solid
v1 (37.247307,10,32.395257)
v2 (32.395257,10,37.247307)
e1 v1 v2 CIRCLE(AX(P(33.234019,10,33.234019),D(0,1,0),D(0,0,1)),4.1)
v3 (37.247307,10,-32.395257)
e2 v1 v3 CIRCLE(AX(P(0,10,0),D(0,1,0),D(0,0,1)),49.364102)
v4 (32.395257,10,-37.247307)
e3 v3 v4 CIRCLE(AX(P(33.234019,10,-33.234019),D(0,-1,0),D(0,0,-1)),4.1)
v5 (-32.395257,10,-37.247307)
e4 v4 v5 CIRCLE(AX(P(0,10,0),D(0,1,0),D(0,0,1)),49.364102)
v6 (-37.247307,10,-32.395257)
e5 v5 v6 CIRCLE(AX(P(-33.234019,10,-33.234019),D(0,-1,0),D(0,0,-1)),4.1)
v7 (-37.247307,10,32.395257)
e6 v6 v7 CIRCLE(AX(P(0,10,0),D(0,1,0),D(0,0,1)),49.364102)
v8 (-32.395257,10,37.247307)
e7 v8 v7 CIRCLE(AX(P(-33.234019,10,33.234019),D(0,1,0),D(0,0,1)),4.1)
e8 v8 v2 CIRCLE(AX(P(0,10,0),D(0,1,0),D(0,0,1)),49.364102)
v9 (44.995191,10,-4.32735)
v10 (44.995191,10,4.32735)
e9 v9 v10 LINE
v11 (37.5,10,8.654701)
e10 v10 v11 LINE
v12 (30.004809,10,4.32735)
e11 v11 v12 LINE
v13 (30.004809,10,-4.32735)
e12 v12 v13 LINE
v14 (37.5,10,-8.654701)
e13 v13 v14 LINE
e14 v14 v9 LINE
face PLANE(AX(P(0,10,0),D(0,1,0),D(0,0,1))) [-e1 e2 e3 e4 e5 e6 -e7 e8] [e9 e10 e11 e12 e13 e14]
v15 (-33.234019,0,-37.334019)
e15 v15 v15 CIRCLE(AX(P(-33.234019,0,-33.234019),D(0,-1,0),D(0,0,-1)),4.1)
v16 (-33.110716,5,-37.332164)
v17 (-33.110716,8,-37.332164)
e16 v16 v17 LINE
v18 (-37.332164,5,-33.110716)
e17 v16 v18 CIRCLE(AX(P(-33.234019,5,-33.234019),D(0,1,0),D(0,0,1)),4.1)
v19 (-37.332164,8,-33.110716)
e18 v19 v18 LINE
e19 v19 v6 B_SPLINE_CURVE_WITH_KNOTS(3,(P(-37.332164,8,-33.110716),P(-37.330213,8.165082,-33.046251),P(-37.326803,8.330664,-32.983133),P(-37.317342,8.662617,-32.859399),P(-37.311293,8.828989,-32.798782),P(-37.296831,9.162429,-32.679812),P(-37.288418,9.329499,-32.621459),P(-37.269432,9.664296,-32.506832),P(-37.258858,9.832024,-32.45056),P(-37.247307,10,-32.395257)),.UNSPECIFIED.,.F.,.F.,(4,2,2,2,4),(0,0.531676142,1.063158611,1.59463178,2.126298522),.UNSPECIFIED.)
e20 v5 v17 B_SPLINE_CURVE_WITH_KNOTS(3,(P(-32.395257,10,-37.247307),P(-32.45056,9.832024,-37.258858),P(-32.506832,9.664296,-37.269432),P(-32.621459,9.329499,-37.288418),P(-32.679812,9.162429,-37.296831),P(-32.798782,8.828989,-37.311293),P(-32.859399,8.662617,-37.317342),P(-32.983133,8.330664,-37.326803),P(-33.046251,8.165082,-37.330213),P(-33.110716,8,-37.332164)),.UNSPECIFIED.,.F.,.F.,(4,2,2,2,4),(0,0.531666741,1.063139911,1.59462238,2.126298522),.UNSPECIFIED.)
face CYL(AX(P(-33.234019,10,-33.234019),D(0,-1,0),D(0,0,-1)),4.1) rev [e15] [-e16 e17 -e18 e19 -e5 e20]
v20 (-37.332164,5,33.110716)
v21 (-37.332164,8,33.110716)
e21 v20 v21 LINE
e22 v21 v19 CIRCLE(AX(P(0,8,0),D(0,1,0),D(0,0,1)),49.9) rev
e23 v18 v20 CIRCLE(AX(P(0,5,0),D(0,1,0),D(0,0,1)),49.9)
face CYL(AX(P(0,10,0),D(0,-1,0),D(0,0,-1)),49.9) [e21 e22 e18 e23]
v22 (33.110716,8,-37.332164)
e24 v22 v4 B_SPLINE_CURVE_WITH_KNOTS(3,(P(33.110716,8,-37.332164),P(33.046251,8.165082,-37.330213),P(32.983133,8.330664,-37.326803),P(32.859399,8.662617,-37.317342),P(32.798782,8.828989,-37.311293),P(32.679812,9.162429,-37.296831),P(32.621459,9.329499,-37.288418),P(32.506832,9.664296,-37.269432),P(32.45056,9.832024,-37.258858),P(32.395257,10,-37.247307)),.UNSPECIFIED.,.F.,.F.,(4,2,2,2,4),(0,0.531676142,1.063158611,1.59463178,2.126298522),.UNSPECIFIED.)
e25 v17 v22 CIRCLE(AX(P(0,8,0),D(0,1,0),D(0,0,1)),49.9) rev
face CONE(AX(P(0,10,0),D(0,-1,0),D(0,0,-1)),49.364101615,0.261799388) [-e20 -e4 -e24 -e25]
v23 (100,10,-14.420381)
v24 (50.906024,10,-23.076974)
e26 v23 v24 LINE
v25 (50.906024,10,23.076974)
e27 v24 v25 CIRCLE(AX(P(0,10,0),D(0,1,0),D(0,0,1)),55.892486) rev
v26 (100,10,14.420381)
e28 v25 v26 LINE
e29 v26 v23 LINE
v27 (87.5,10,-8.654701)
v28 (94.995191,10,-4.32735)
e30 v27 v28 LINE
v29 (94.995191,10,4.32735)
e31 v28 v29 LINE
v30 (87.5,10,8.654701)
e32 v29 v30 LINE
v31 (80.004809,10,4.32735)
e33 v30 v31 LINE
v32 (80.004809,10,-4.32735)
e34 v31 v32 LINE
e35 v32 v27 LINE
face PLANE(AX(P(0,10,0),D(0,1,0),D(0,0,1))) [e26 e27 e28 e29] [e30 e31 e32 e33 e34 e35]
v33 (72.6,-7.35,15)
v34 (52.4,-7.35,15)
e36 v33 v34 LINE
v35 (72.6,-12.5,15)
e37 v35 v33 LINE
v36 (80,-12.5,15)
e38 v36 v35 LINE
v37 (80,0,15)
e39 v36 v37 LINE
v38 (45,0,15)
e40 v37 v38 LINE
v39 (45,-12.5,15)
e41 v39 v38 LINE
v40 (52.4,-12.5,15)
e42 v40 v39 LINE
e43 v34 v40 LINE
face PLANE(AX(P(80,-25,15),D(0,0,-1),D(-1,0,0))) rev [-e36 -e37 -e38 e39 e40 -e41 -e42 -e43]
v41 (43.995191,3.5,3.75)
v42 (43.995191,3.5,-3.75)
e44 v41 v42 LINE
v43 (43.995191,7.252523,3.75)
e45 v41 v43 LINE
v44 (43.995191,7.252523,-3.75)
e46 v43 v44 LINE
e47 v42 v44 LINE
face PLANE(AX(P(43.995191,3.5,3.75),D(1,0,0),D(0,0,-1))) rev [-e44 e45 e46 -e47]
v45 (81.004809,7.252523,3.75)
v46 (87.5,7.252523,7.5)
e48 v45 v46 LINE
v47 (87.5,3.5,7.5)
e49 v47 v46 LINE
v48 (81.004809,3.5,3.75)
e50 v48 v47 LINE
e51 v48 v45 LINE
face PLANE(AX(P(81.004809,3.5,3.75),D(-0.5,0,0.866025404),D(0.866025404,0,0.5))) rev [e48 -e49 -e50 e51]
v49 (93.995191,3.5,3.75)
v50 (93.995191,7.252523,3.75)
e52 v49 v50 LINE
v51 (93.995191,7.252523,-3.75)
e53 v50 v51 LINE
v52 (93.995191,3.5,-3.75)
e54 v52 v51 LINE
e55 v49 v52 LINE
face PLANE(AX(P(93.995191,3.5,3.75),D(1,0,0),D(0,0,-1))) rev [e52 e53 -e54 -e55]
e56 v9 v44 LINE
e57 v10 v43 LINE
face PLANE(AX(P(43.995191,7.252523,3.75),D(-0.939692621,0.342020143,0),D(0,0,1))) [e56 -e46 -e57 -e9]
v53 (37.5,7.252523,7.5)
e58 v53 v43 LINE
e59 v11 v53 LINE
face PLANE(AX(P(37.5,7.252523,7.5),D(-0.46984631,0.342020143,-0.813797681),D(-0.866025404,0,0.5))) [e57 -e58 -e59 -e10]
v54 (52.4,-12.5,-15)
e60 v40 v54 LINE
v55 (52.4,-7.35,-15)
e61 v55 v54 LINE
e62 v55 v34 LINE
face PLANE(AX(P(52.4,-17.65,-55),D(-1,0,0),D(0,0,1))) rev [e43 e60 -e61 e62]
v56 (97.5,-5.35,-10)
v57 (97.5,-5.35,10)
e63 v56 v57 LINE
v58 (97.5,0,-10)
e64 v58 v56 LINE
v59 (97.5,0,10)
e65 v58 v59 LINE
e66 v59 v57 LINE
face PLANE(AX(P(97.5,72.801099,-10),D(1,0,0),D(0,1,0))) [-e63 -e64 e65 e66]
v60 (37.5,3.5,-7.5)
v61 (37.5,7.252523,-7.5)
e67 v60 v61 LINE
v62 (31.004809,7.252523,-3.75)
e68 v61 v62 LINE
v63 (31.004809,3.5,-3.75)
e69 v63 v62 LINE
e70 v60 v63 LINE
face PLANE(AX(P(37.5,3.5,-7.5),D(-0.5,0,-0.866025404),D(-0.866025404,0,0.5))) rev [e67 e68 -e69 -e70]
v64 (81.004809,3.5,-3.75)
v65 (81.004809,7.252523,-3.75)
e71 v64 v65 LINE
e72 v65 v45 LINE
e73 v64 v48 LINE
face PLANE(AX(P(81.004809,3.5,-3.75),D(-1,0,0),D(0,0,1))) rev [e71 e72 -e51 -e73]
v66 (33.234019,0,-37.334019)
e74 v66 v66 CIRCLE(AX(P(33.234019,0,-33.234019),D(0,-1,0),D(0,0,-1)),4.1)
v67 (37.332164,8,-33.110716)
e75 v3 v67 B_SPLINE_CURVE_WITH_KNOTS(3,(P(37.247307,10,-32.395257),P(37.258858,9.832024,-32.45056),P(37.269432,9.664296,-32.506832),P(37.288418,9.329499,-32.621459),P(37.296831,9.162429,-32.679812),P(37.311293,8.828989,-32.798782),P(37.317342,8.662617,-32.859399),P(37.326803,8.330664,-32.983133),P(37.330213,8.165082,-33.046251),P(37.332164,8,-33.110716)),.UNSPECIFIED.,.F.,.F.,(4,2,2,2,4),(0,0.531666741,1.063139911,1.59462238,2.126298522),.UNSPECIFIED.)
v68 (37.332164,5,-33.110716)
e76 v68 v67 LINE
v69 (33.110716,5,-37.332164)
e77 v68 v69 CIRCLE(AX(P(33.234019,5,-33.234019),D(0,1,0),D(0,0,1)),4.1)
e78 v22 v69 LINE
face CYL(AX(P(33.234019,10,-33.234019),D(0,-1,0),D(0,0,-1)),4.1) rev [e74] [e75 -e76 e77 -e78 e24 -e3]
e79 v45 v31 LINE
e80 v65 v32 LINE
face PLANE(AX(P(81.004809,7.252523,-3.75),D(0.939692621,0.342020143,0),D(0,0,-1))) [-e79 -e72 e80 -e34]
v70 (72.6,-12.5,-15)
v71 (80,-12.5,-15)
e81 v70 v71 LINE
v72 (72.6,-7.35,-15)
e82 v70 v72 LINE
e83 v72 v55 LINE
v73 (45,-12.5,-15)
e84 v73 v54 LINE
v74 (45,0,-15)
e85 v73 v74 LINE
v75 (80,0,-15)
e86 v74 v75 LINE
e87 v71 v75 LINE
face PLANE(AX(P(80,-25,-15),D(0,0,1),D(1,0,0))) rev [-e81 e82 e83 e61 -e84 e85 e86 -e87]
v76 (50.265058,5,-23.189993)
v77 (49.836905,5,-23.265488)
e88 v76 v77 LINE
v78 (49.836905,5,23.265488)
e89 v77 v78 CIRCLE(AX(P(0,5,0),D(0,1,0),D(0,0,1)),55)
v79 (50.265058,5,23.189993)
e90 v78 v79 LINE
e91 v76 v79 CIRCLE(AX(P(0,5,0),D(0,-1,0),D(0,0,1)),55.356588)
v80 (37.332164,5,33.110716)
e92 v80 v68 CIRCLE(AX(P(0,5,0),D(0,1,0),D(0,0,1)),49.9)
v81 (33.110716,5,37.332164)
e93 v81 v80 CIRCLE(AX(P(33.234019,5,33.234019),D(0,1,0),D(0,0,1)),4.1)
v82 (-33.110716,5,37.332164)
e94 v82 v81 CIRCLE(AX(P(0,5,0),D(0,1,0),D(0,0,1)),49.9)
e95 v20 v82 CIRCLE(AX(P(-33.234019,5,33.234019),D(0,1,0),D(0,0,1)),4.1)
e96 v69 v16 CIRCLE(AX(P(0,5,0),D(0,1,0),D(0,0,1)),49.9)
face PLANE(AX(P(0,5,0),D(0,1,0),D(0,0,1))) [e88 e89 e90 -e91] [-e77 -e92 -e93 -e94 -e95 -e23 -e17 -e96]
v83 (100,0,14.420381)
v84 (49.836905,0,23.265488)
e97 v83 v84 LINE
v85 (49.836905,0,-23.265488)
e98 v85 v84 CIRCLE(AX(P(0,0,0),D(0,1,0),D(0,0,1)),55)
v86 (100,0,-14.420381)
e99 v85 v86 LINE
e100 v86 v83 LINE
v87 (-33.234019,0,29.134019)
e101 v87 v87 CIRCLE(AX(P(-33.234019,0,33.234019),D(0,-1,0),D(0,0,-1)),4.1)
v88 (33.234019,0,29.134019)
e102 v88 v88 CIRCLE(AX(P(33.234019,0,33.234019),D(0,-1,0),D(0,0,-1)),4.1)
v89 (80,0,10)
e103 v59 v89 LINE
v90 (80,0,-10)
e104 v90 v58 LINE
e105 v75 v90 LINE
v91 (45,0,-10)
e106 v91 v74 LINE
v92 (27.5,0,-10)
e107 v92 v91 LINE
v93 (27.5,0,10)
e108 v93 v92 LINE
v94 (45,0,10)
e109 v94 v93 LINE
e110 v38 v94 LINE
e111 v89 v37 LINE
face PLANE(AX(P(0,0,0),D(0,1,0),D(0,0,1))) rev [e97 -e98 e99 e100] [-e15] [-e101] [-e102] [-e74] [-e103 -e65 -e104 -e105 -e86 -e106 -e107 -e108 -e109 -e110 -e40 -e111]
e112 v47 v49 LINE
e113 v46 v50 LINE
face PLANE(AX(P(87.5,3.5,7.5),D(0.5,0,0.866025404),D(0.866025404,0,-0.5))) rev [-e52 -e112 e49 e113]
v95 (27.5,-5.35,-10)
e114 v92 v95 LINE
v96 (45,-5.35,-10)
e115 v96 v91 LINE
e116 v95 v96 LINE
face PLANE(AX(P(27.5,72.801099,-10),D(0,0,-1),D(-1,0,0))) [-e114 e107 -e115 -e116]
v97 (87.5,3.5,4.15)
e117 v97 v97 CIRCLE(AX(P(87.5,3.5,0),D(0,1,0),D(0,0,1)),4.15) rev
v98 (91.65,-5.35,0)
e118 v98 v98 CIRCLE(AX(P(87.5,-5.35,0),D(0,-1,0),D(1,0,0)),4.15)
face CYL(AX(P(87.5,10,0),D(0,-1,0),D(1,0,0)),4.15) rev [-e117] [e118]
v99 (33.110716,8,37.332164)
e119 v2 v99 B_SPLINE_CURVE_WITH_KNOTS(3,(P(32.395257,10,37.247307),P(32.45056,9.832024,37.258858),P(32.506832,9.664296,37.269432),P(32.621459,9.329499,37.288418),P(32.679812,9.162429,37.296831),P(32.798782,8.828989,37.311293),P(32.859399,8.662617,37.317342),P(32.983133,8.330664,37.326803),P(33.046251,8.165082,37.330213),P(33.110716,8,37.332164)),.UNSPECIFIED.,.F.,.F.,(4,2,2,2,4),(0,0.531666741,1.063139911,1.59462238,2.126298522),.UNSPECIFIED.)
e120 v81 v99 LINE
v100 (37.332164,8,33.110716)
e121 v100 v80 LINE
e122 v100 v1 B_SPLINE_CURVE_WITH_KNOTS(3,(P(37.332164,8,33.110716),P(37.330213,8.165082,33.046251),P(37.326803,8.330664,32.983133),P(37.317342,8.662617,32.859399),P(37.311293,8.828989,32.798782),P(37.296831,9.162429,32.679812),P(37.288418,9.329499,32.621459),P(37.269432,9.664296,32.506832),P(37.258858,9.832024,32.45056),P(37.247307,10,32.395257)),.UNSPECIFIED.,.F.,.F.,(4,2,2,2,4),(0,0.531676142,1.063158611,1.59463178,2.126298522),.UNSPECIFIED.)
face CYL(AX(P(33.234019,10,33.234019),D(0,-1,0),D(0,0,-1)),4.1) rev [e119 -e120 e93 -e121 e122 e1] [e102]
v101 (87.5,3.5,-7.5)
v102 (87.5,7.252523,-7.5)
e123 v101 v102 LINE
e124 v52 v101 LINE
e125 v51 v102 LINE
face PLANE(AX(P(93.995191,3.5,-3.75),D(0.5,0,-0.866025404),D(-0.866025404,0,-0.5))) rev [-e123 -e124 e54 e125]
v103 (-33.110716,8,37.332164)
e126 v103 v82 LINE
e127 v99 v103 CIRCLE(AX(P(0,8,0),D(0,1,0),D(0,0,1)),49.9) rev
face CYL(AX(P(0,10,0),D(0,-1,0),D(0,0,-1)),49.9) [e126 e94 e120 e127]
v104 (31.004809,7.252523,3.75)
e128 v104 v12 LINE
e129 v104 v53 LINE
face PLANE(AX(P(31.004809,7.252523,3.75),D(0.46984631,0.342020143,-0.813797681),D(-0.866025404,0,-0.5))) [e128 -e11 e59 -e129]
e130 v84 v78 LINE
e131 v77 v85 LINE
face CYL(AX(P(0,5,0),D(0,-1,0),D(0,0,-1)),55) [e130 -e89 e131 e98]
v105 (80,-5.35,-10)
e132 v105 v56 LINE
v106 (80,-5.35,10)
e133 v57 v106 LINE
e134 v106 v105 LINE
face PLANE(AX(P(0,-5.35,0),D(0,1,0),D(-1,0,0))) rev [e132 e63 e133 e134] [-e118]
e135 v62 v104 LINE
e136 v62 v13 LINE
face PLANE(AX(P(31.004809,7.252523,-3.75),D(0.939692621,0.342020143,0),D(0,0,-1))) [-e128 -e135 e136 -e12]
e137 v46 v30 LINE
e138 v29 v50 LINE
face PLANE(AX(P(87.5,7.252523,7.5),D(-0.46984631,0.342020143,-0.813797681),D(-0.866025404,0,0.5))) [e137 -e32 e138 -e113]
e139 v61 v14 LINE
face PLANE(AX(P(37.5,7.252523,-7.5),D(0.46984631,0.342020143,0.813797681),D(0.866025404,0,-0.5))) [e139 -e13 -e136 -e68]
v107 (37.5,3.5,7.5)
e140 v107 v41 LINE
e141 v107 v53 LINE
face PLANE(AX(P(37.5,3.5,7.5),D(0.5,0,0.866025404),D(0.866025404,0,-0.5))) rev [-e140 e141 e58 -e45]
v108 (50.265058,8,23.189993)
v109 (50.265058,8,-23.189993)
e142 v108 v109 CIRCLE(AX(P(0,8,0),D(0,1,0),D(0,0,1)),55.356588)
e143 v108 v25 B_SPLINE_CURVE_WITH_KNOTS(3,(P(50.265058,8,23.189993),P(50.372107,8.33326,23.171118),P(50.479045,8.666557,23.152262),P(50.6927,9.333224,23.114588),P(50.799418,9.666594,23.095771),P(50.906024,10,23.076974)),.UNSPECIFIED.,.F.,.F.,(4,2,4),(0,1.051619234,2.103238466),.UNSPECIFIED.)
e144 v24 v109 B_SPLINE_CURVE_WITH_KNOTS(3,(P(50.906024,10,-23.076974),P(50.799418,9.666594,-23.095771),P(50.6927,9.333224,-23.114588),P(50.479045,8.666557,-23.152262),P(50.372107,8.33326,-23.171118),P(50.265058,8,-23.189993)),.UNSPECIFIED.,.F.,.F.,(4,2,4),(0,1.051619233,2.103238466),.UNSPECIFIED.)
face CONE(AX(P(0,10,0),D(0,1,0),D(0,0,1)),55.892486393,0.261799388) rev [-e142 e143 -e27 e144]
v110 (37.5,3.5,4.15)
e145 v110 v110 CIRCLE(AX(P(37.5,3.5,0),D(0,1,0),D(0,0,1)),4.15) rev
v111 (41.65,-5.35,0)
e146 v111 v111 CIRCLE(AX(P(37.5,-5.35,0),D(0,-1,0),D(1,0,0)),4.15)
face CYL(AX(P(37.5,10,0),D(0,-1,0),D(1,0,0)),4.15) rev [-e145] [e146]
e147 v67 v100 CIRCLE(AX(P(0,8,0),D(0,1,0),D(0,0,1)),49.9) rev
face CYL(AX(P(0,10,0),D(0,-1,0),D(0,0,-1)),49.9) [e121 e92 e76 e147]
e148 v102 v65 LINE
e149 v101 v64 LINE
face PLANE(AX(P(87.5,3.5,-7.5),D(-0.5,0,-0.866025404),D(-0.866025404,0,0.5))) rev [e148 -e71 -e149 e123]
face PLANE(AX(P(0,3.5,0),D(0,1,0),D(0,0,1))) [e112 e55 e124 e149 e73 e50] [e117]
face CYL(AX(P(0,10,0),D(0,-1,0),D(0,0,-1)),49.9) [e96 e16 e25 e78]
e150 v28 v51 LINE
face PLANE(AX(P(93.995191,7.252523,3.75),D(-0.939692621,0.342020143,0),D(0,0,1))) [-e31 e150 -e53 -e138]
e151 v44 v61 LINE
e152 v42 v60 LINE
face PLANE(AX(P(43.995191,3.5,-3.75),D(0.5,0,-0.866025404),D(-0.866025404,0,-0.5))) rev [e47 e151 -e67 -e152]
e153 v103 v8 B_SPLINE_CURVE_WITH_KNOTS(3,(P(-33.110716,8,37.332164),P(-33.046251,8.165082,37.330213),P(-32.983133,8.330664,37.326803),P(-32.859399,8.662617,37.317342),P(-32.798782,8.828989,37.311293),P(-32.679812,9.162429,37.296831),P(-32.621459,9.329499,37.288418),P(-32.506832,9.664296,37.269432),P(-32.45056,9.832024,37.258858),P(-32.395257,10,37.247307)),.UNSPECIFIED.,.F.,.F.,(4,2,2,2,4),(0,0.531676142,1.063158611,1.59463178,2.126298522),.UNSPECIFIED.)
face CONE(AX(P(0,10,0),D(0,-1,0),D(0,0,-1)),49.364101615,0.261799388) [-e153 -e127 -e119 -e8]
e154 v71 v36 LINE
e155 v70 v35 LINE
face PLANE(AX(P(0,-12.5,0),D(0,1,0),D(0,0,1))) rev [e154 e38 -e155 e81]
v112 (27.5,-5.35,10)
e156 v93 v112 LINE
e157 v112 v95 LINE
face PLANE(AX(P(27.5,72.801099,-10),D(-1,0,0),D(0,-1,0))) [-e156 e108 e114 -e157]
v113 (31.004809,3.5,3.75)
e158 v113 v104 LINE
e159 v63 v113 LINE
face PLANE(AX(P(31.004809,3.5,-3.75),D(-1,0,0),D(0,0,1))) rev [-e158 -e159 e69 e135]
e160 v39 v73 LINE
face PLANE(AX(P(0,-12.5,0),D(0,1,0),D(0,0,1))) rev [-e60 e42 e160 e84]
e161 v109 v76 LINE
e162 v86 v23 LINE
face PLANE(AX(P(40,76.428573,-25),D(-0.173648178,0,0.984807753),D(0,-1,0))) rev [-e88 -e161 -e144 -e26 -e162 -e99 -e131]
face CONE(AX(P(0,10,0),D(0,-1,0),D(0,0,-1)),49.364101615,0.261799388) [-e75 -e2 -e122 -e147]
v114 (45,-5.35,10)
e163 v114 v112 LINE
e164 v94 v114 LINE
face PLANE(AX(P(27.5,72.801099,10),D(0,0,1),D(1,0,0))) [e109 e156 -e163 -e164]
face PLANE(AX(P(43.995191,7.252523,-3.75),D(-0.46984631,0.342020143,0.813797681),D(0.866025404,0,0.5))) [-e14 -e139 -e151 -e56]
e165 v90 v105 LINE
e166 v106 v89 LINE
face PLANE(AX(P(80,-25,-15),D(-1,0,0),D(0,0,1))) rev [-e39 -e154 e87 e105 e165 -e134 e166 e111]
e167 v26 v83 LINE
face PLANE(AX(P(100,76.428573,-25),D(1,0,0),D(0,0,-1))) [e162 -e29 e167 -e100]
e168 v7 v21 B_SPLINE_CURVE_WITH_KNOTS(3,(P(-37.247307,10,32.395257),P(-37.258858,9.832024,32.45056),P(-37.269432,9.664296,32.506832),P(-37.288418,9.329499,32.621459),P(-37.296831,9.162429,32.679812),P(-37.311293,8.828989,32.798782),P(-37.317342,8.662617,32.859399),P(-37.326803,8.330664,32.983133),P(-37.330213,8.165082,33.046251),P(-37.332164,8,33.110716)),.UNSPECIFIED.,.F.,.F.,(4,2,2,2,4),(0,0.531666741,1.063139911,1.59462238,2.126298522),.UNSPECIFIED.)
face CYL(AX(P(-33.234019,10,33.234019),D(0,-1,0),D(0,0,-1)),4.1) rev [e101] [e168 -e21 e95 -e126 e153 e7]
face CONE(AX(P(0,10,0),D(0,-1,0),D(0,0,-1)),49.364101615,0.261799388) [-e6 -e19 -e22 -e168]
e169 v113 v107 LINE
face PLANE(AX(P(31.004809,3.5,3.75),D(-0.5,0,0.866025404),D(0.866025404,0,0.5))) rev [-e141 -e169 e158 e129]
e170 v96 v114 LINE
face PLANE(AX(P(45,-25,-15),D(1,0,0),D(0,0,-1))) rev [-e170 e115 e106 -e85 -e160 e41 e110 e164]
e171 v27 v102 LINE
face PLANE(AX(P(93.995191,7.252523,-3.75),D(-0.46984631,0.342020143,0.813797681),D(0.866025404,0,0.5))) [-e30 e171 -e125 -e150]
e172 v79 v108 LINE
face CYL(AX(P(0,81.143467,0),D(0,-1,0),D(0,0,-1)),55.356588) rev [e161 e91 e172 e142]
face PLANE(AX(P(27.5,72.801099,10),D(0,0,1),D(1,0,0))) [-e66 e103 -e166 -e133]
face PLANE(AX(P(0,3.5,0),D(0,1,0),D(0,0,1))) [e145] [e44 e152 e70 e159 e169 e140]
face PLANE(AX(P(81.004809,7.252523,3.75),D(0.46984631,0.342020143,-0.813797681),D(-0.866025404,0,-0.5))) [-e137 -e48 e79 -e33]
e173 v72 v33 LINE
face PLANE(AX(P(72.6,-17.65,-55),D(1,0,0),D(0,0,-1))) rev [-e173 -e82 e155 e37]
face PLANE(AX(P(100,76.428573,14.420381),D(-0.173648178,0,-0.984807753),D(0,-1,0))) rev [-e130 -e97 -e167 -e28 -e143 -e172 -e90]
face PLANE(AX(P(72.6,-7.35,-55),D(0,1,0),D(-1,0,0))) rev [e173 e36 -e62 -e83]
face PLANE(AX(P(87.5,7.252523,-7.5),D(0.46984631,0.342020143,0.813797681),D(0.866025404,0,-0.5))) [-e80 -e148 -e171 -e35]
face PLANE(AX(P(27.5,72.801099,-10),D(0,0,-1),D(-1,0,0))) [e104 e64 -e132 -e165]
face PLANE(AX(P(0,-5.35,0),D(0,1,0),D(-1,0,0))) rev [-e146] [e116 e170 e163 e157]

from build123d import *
from OCP.BRepFilletAPI import BRepFilletAPI_MakeChamfer

# Parameters (mm, degrees)
SKETCH_1_R          = 55
EXTRUDE_1_DEPTH     = 5
SKETCH_2_R          = 49.9
EXTRUDE_2_DEPTH     = 5
SKETCH7_W           = 51.010205144
SKETCH7_H           = 50
BOSS_EXTRUDE2_DEPTH = 5
SKETCH_3_W          = 35
SKETCH_3_H          = 30
EXTRUDE_3_DEPTH     = 25
SKETCH_4_W          = 20.2
SKETCH_4_H          = 10.3
CUT_EXTRUDE_1_DEPTH = 125.599357944
SKETCH_5_R          = 4.1
CUT_EXTRUDE_2_DEPTH = 117.833214455
CHAMFER1_SIZE       = 2
CHAMFER1_SIZE2      = 0.535898385
SKETCH2_W           = 35
SKETCH2_H           = 30
CUT_EXTRUDE1_DEPTH  = 12.5
BOSS_EXTRUDE1_START = -2
SKETCH4_W           = 70
SKETCH4_H           = 20
BOSS_EXTRUDE1_DEPTH = 5.35
SKETCH5_R           = 4.15
CUT_EXTRUDE2_DEPTH  = 116.154776293
SKETCH9_R           = 4.15
BOSS_EXTRUDE3_DEPTH = 5
CHAMFER3_SIZE       = 2
CHAMFER3_SIZE2      = 0.535898385
CUT_EXTRUDE3_DEPTH  = 6.5
CHAMFER2_SIZE       = 1
CHAMFER2_SIZE2      = 2.747477419
CHAMFER4_SIZE       = 10.579618843
CHAMFER4_SIZE_2     = 60


with BuildPart() as part:
    # Эскиз1 → Бобышка-Вытянуть1 (new body)
    with BuildSketch(Plane(origin=(0, 0, 0), x_dir=(1, 0, 0), z_dir=(0, 1, 0))):
        with Locations(Location((0, 0, 0), (0, 0, 270))):
            Circle(SKETCH_1_R)
    extrude(amount=EXTRUDE_1_DEPTH)

    # Эскиз2 → Бобышка-Вытянуть2 (add)
    with BuildSketch(Plane(origin=(0, 5, 0), x_dir=(1, 0, 0), z_dir=(0, 1, 0))):
        with Locations(Location((0, 0, 0), (0, 0, 270))):
            Circle(SKETCH_2_R)
    extrude(amount=EXTRUDE_2_DEPTH)

    # Sketch7 → Boss-Extrude2 (add)
    with BuildSketch(Plane.XZ):
        with Locations((74.494897428, 0)):
            Rectangle(SKETCH7_W, SKETCH7_H)
    extrude(amount=-BOSS_EXTRUDE2_DEPTH)

    # Эскиз3 → Бобышка-Вытянуть3 (add)
    with BuildSketch(Plane.XZ):
        with Locations((62.5, 0)):
            Rectangle(SKETCH_3_W, SKETCH_3_H)
    extrude(amount=EXTRUDE_3_DEPTH)

    # Эскиз4 → Вырез-Вытянуть1 (cut, through all)
    with BuildSketch(Plane.XY.offset(15)):
        with Locations((62.5, -12.5)):
            Rectangle(SKETCH_4_W, SKETCH_4_H)
    extrude(amount=-CUT_EXTRUDE_1_DEPTH, mode=Mode.SUBTRACT)

    # Эскиз5 → Вырез-Вытянуть2 (cut, through all)
    with BuildSketch(Plane.XZ):
        with Locations(Location((33.234018716, -33.234018716, 0), (0, 0, 270))):
            Circle(SKETCH_5_R)
        with Locations(Location((-33.234018716, -33.234018716, 0), (0, 0, 270))):
            Circle(SKETCH_5_R)
        with Locations(Location((-33.234018716, 33.234018716, 0), (0, 0, 270))):
            Circle(SKETCH_5_R)
        with Locations(Location((33.234018716, 33.234018716, 0), (0, 0, 270))):
            Circle(SKETCH_5_R)
    extrude(amount=-CUT_EXTRUDE_2_DEPTH, mode=Mode.SUBTRACT)

    # Chamfer1: one chamfer whose edges measure the first distance from different faces: ONE call of the kernel's chamfer builder (chamfer() names one face for all edges)
    chamfer1_edges_1 = [part.edges().sort_by_distance(p)[0] for p in [
        (0, 10, -49.9),
    ]]
    chamfer1_side_1 = [part.faces().sort_by_distance(p)[0] for p in [
        (0, 7.5, -49.9),
    ]]
    chamfer1_edges_2 = [part.edges().sort_by_distance(p)[0] for p in [
        (-49.9, 10, 0),
    ]]
    chamfer1_side_2 = [part.faces().sort_by_distance(p)[0] for p in [
        (-49.9, 7.5, 0),
    ]]
    chamfer1_edges_3 = [part.edges().sort_by_distance(p)[0] for p in [
        (0, 10, 49.9),
    ]]
    chamfer1_side_3 = [part.faces().sort_by_distance(p)[0] for p in [
        (0, 7.5, 49.9),
    ]]
    chamfer1_edges_4 = [part.edges().sort_by_distance(p)[0] for p in [
        (49.9, 10, 0),
    ]]
    chamfer1_side_4 = [part.faces().sort_by_distance(p)[0] for p in [
        (49.9, 7.5, 0),
    ]]
    chamfer1 = BRepFilletAPI_MakeChamfer(part.part.solid().wrapped)
    for e in chamfer1_edges_1:
        chamfer1.Add(CHAMFER1_SIZE, CHAMFER1_SIZE2, e.wrapped, chamfer1_side_1[0].wrapped)  # the first distance lies on this face
    for e in chamfer1_edges_2:
        chamfer1.Add(CHAMFER1_SIZE, CHAMFER1_SIZE2, e.wrapped, chamfer1_side_2[0].wrapped)  # the first distance lies on this face
    for e in chamfer1_edges_3:
        chamfer1.Add(CHAMFER1_SIZE, CHAMFER1_SIZE2, e.wrapped, chamfer1_side_3[0].wrapped)  # the first distance lies on this face
    for e in chamfer1_edges_4:
        chamfer1.Add(CHAMFER1_SIZE, CHAMFER1_SIZE2, e.wrapped, chamfer1_side_4[0].wrapped)  # the first distance lies on this face
    add(Compound.cast(chamfer1.Shape()), mode=Mode.REPLACE)

    # Sketch2 → Cut-Extrude1 (cut)
    with BuildSketch(Plane.XZ.offset(25)):
        with Locations((62.5, 0)):
            Rectangle(SKETCH2_W, SKETCH2_H)
    extrude(amount=-CUT_EXTRUDE1_DEPTH, mode=Mode.SUBTRACT)

    # Sketch4 → Boss-Extrude1 (add)
    with BuildSketch(Plane.XZ.offset(7.35).offset(BOSS_EXTRUDE1_START)):
        with Locations((62.5, 0)):
            Rectangle(SKETCH4_W, SKETCH4_H)
    extrude(amount=-BOSS_EXTRUDE1_DEPTH)

    # Sketch5 → Cut-Extrude2 (cut, through all)
    with BuildSketch(Plane.XZ.offset(5.35)):
        with Locations((87.5, 0)):
            Circle(SKETCH5_R)
        with Locations((37.5, 0)):
            Circle(SKETCH5_R)
    extrude(amount=-CUT_EXTRUDE2_DEPTH, mode=Mode.SUBTRACT)

    # Sketch9 → Boss-Extrude3 (add)
    # profile 1 of 2: a face of its own
    with BuildSketch(Plane(origin=(0, 5, 0), x_dir=(1, 0, 0), z_dir=(0, 1, 0))):
        with Locations((37.5, 0)):
            Circle(SKETCH9_R)
    # profile 2 of 2: a face of its own
    with BuildSketch(Plane(origin=(0, 5, 0), x_dir=(1, 0, 0), z_dir=(0, 1, 0))):
        with BuildLine():
            Line((49.389794856, -25), (100, -25))
            Line((100, -25), (100, 25))
            Line((100, 25), (49.389794856, 25))
            ThreePointArc((49.389794856, 25), (55.356588008, 0), (49.389794856, -25))
        make_face()
        with Locations((87.5, 0)):
            Circle(SKETCH9_R, mode=Mode.SUBTRACT)
    extrude(amount=BOSS_EXTRUDE3_DEPTH)

    # Chamfer3
    chamfer3_edges = [part.edges().sort_by_distance(p)[0] for p in [
        (55.356588008, 10, 0),
    ]]
    chamfer3_side = [part.faces().sort_by_distance(p)[0] for p in [
        (55.356588008, 7.5, 0),
    ]]
    chamfer(chamfer3_edges, length=CHAMFER3_SIZE, length2=CHAMFER3_SIZE2, reference=chamfer3_side[0])

    # Sketch6 → Cut-Extrude3 (cut)
    with BuildSketch(Plane(origin=(0, 10, 0), x_dir=(1, 0, 0), z_dir=(0, 1, 0))):
        Polygon((43.995190528, 3.75), (37.5, 7.5), (31.004809472, 3.75), (31.004809472, -3.75), (37.5, -7.5), (43.995190528, -3.75), align=None)
        Polygon((93.995190528, 3.75), (87.5, 7.5), (81.004809472, 3.75), (81.004809472, -3.75), (87.5, -7.5), (93.995190528, -3.75), align=None)
    extrude(amount=-CUT_EXTRUDE3_DEPTH, mode=Mode.SUBTRACT)

    # Chamfer2: one chamfer whose edges measure the first distance from different faces: ONE call of the kernel's chamfer builder (chamfer() names one face for all edges)
    chamfer2_edges_1 = [part.edges().sort_by_distance(p)[0] for p in [
        (43.995190528, 10, 0),
        (40.747595264, 10, -5.625),
        (34.252404736, 10, -5.625),
        (31.004809472, 10, 0),
        (34.252404736, 10, 5.625),
        (40.747595264, 10, 5.625),
    ]]
    chamfer2_side_1 = [part.faces().sort_by_distance(p)[0] for p in [
        (-0.7474754, 10, 0),
    ]]
    chamfer2_edges_2 = [part.edges().sort_by_distance(p)[0] for p in [
        (93.995190528, 10, 0),
        (90.747595264, 10, -5.625),
        (84.252404736, 10, -5.625),
        (81.004809472, 10, 0),
        (84.252404736, 10, 5.625),
        (90.747595264, 10, 5.625),
    ]]
    chamfer2_side_2 = [part.faces().sort_by_distance(p)[0] for p in [
        (76.23589774, 10, 0),
    ]]
    chamfer2 = BRepFilletAPI_MakeChamfer(part.part.solid().wrapped)
    for e in chamfer2_edges_1:
        chamfer2.Add(CHAMFER2_SIZE, CHAMFER2_SIZE2, e.wrapped, chamfer2_side_1[0].wrapped)  # the first distance lies on this face
    for e in chamfer2_edges_2:
        chamfer2.Add(CHAMFER2_SIZE, CHAMFER2_SIZE2, e.wrapped, chamfer2_side_2[0].wrapped)  # the first distance lies on this face
    add(Compound.cast(chamfer2.Shape()), mode=Mode.REPLACE)

    # Chamfer4
    # the kernel refuses this chamfer: 60, 10.579618843 mm, written as the material it takes off along each edge
    with BuildSketch(Plane(origin=(100, 165.912327785, -25), x_dir=(0.21013876076743138, 0, 0.9776715712462587), z_dir=(0, -1, 0))) as chamfer4_piece_1_section:
        Polygon((CHAMFER4_SIZE * 0.977671571201, CHAMFER4_SIZE * 0.210138760758), (-CHAMFER4_SIZE_2 * 0.210138760767, CHAMFER4_SIZE_2 * 0.977671571246), (0, 0), align=None)
    chamfer4_piece_1 = extrude(amount=321.824655571, mode=Mode.PRIVATE)
    chamfer4_piece_1 = chamfer4_piece_1 - Plane(origin=(0, 7.498692245, 0), x_dir=(0, 0, 1), z_dir=(0, -1, 0)) * Cylinder(55, 879, mode=Mode.PRIVATE)
    add(chamfer4_piece_1, mode=Mode.SUBTRACT)
    with BuildSketch(Plane(origin=(100, -155.912327785, 25), x_dir=(-0.9999776716360547, 0, 0.006682531656101301), z_dir=(0, 1, 0))) as chamfer4_piece_2_section:
        Polygon((CHAMFER4_SIZE_2 * 0.999977671636, -CHAMFER4_SIZE_2 * 0.0066825316561), (-CHAMFER4_SIZE * 0.00668253165579, -CHAMFER4_SIZE * 0.99997767159), (0, 0), align=None)
    chamfer4_piece_2 = extrude(amount=321.824655571, mode=Mode.PRIVATE)
    chamfer4_piece_2 = chamfer4_piece_2 - Plane(origin=(0, 2.5, 0), x_dir=(0, 0, 1), z_dir=(0, -1, 0)) * Cylinder(55, 884, mode=Mode.PRIVATE)
    add(chamfer4_piece_2, mode=Mode.SUBTRACT)


solid = part.part
